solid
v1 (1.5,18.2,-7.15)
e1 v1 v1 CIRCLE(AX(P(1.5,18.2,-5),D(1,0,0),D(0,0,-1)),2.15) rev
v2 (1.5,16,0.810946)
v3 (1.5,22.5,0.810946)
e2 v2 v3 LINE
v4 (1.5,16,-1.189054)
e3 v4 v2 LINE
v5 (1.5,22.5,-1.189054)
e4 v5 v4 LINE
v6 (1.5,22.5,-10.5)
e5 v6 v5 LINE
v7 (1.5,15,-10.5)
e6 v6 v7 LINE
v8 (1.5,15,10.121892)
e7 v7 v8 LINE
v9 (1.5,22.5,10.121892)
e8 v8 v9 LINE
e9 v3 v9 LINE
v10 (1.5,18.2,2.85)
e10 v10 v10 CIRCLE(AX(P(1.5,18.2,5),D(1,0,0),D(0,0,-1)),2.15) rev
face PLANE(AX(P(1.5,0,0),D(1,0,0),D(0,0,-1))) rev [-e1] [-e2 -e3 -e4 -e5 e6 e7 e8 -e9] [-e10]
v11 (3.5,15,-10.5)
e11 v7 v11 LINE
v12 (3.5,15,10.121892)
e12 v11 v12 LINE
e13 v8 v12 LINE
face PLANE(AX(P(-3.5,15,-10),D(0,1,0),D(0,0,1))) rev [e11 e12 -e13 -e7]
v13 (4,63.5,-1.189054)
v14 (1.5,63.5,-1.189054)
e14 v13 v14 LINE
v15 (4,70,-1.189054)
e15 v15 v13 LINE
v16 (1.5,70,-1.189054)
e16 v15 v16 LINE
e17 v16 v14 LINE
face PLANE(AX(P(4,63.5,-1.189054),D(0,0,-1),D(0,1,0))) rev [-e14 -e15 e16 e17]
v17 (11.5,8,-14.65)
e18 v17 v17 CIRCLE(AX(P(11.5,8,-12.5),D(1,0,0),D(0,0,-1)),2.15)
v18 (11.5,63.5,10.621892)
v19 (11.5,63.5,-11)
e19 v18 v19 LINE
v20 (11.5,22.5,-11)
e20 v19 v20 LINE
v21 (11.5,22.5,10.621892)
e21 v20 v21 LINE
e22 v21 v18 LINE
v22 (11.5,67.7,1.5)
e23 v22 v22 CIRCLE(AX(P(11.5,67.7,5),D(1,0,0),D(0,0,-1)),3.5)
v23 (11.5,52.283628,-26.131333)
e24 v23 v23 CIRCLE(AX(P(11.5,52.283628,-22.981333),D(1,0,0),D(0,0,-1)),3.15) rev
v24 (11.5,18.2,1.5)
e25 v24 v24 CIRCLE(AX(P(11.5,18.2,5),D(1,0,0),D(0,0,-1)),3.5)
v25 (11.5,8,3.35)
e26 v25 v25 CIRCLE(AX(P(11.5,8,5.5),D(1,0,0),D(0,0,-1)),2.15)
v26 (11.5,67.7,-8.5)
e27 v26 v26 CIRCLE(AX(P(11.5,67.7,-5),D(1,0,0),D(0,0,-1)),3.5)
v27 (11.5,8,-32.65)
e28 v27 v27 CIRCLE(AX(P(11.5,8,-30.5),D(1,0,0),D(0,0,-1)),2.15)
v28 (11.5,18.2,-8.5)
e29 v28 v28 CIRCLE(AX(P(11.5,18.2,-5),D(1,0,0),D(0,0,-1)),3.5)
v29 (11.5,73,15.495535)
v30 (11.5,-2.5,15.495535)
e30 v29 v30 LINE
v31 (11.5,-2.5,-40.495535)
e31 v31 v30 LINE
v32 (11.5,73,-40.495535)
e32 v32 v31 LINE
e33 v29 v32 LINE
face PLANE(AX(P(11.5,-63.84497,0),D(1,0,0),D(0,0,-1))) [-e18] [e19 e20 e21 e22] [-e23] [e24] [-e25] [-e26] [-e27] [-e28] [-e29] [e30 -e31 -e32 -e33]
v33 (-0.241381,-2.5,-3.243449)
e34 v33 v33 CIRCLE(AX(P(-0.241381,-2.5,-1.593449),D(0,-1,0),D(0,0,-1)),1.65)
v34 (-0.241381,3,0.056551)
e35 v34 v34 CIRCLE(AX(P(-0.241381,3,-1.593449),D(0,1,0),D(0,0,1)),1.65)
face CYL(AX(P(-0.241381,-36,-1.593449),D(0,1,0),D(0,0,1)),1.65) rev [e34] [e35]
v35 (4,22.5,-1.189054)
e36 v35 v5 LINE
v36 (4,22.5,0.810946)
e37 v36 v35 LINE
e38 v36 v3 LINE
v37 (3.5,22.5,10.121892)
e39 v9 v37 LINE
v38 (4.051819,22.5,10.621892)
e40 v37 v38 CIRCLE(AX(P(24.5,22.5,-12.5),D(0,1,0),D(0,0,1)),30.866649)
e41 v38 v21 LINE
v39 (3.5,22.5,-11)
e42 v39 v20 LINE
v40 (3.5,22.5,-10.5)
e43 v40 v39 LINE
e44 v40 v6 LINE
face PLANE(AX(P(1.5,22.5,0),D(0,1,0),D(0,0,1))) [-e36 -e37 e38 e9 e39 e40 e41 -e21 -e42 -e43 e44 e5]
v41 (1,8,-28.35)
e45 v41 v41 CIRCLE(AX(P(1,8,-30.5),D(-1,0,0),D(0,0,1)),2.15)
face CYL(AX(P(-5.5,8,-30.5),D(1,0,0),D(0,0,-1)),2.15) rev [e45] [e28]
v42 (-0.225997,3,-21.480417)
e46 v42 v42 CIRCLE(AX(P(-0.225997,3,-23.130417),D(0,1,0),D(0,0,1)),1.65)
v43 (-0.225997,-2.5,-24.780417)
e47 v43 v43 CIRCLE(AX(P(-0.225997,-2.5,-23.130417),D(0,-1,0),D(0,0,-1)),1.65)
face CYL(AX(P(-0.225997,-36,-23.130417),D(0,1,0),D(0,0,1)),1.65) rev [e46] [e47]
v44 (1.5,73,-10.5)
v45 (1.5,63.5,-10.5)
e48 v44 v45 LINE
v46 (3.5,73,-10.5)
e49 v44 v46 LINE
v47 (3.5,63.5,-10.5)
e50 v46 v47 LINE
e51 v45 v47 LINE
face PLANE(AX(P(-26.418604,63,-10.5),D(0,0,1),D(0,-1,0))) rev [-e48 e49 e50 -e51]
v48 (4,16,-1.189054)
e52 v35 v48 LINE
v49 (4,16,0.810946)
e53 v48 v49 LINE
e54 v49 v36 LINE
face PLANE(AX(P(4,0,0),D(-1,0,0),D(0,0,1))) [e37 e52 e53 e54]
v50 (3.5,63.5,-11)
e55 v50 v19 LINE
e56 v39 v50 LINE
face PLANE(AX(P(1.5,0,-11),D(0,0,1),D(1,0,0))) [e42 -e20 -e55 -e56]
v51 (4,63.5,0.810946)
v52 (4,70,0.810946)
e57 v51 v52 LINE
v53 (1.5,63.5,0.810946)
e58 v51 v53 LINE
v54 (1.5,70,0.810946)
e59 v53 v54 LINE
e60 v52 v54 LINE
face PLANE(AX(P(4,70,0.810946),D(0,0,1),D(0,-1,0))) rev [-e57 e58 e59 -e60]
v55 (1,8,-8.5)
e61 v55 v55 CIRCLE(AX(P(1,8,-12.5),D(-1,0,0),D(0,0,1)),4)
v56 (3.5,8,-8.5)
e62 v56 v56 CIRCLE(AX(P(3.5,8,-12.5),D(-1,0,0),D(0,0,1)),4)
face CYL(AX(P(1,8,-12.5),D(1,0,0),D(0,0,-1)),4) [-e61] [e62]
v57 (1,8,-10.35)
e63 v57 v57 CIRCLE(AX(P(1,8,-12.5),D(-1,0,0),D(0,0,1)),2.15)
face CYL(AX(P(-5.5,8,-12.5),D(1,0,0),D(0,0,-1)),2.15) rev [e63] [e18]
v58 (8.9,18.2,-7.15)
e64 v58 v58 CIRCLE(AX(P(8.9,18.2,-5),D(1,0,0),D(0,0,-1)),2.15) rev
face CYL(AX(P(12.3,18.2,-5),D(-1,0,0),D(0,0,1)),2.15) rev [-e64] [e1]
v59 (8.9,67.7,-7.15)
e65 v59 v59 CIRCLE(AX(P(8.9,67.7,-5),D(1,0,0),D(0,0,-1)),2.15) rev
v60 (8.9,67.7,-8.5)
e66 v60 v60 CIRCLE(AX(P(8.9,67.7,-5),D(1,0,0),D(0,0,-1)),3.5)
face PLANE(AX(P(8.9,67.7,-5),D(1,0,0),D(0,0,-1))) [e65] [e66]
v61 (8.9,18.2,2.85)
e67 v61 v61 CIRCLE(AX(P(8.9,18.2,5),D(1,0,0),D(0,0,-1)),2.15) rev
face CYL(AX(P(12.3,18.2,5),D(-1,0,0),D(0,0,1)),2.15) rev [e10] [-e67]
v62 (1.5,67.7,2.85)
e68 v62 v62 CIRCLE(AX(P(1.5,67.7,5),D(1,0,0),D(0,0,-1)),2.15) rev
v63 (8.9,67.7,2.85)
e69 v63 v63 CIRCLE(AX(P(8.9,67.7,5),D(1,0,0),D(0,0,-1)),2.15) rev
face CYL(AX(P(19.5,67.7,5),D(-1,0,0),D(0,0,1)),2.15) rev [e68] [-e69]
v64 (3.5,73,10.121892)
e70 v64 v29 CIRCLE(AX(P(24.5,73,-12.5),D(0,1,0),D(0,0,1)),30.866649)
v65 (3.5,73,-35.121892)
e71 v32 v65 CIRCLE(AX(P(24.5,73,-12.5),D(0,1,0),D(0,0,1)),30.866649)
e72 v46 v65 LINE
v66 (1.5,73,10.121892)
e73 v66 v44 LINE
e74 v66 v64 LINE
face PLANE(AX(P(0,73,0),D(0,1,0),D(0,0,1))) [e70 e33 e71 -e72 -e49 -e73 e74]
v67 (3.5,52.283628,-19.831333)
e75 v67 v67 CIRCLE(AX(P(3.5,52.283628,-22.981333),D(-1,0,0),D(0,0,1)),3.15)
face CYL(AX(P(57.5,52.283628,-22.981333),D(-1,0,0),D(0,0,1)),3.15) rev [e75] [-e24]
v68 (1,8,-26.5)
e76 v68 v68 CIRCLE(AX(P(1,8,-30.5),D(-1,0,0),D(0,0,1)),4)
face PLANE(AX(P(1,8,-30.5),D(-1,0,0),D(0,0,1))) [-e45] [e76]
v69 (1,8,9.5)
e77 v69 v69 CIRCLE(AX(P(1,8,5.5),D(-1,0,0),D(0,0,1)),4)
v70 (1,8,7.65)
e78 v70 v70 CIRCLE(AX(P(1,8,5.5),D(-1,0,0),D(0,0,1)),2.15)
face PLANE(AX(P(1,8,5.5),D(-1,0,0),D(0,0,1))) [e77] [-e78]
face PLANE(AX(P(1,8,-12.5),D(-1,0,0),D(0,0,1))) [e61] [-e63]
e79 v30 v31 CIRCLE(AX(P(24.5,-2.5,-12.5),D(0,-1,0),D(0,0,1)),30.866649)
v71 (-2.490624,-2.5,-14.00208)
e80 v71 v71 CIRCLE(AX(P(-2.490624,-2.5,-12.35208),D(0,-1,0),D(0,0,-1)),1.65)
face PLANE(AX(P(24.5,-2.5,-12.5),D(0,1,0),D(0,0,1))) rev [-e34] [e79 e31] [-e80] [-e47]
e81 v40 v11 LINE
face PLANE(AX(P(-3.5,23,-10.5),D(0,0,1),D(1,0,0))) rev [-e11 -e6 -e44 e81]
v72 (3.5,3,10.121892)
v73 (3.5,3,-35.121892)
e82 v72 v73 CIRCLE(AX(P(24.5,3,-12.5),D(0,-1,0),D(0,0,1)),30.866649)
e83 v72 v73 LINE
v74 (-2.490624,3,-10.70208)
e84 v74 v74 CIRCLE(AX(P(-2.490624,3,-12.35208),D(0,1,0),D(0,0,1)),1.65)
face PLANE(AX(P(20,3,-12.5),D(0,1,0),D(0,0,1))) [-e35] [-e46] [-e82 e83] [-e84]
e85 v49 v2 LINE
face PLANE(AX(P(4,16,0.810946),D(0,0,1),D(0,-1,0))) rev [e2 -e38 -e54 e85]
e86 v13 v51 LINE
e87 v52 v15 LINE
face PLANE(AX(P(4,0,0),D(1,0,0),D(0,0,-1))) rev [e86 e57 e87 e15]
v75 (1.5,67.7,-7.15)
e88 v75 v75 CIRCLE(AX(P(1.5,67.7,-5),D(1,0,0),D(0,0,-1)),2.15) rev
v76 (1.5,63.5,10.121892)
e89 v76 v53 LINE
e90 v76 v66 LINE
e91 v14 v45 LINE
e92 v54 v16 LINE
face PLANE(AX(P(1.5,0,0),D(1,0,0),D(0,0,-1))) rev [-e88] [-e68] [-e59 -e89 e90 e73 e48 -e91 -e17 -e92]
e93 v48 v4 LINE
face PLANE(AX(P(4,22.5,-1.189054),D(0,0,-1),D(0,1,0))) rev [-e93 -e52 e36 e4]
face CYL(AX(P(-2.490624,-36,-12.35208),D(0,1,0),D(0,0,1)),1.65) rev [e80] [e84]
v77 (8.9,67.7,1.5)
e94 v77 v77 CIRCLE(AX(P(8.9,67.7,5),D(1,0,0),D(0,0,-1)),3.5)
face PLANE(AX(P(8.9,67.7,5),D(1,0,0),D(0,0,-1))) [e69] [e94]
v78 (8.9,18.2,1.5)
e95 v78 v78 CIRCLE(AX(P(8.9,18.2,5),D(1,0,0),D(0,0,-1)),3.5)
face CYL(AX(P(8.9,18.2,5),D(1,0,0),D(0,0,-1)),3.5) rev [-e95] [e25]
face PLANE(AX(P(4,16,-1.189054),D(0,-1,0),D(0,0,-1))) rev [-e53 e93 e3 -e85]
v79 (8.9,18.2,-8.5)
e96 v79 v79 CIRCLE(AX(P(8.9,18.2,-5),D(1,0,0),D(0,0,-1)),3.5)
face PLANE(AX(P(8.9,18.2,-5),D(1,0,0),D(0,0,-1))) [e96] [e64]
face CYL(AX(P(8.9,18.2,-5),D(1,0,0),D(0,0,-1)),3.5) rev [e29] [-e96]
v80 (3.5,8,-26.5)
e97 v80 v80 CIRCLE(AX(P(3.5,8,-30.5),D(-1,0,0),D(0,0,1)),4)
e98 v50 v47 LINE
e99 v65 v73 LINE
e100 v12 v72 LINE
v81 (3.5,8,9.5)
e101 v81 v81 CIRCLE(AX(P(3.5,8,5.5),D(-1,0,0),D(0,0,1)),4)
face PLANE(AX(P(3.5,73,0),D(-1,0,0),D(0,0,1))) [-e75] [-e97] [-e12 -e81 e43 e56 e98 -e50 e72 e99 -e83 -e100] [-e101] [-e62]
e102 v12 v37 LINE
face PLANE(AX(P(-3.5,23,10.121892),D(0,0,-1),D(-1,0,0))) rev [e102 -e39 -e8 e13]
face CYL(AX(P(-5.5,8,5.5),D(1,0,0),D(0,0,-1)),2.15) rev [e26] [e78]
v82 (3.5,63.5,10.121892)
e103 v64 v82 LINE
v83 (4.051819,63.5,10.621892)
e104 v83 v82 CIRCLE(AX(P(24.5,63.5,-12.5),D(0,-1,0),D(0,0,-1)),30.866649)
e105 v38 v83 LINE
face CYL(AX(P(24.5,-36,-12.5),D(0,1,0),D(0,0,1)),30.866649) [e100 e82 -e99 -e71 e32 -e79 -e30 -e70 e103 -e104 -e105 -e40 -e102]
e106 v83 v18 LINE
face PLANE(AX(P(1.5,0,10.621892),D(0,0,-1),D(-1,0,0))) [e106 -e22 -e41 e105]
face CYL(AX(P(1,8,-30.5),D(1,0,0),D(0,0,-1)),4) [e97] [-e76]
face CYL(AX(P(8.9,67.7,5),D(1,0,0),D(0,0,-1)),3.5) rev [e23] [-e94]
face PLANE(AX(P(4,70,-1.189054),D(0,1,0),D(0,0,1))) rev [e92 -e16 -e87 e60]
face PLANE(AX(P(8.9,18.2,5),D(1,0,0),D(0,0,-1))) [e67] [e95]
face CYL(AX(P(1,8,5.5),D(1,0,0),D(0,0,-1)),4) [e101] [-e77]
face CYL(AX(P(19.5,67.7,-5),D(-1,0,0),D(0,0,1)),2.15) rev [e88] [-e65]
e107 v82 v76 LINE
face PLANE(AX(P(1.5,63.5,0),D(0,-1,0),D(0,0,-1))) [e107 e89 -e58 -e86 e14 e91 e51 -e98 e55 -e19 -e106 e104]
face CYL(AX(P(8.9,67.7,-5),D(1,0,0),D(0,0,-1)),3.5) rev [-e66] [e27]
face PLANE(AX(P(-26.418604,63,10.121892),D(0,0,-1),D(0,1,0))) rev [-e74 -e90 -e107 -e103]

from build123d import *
from build123d.topology import SkipClean

# Parameters (mm, degrees)
SKETCH1_R                = 28
BOSS_EXTRUDE1_DEPTH      = 3
SKETCH2_R                = 1.625
CUT_EXTRUDE1_DEPTH       = 3
BOSS_EXTRUDE4_START      = 3
BOSS_EXTRUDE4_OUTLINE_R  = 1.625
BOSS_EXTRUDE4_DEPTH      = 70
BOSS_EXTRUDE6_DEPTH      = 7
CUT_EXTRUDE13_START      = -10
CUT_EXTRUDE13_DEPTH      = 10
SKETCH14_R               = 3.15
CUT_EXTRUDE7_DEPTH       = 54
SKETCH17_R               = 2.15
CUT_EXTRUDE10_DEPTH      = 15.8
CUT_EXTRUDE12_START      = -3
CUT_EXTRUDE12_DEPTH      = 3
SKETCH21_W               = 20.621892052
SKETCH21_H               = 10
BOSS_EXTRUDE7_DEPTH      = 7
SKETCH23_R               = 2.15
CUT_EXTRUDE17_DEPTH      = 23
SKETCH26_W               = 20.621892052
SKETCH26_H               = 58
CUT_EXTRUDE21_DEPTH      = 5
CUT_EXTRUDE22_DEPTH      = 5
SKETCH41_R               = 1.625
CUT_EXTRUDE23_DEPTH      = 70
CUT_EXTRUDE24_START      = -39
CUT_EXTRUDE24_DEPTH      = 39
BOSS_EXTRUDE12_START     = -3
SKETCH43_R               = 30.866648668
BOSS_EXTRUDE12_DEPTH     = 3
BOSS_EXTRUDE13_DEPTH     = 70
BOSS_EXTRUDE14_DEPTH     = 70
SKETCH47_R               = 1.625
SKETCH47_R_2             = 1.65
CUT_EXTRUDE26_DEPTH      = 39
SKETCH51_R               = 3.5
CUT_EXTRUDE30_DEPTH      = 2.6
CUT_EXTRUDE31_DEPTH      = 79
CUT_EXTRUDE31_DEPTH_BACK = 23
SKETCH53_R               = 2.15
CUT_EXTRUDE32_DEPTH      = 17
SKETCH56_R               = 4
SKETCH56_R_2             = 2.15
BOSS_EXTRUDE15_DEPTH     = 2.5
SKETCH57_W               = 20.621892052
SKETCH57_H               = 40
CUT_EXTRUDE33_DEPTH      = 10
SKETCH58_W               = 2
SKETCH58_H               = 6.5
CUT_EXTRUDE34_DEPTH      = 2.5
SKETCH59_R               = 1.65
BOSS_EXTRUDE16_DEPTH     = 2.5


# Read off the part's stored shape, not the designer's step: Boss-Extrude4, Cut-Extrude13
with BuildPart() as part:
    # Sketch1 → Boss-Extrude1 (new body)
    with BuildSketch(Plane(origin=(0, 0, 0), x_dir=(1, 0, 0), z_dir=(0, 1, 0))):
        with Locations(Location((20, 12.5, 0), (0, 0, 270))):
            Circle(SKETCH1_R)
    extrude(amount=BOSS_EXTRUDE1_DEPTH)

    # Sketch2 → Cut-Extrude1 (cut)
    with BuildSketch(Plane(origin=(0, 3, 0), x_dir=(1, 0, 0), z_dir=(0, 1, 0))):
        with Locations(Location((20, 19.5, 0), (0, 0, 270))):
            Circle(SKETCH2_R)
        with Locations(Location((20, 5.5, 0), (0, 0, 270))):
            Circle(SKETCH2_R)
        with Locations(Location((20, 12.5, 0), (0, 0, 270))):
            Circle(SKETCH2_R)
    extrude(amount=-CUT_EXTRUDE1_DEPTH, mode=Mode.SUBTRACT)

    # Boss-Extrude4 outline → Boss-Extrude4 (add)
    with SkipClean():  # the faces are left unmerged after this step: merging them gives an invalid solid
        with BuildSketch(Plane(origin=(0, 0, 0), x_dir=(1, 0, 0), z_dir=(0, 1, 0)).offset(BOSS_EXTRUDE4_START)):
            with BuildLine():
                ThreePointArc((3.5, -10.121892052), (48, 12.5), (3.5, 35.121892052))
                Line((3.5, 35.121892052), (3.5, -10.121892052))
            make_face()
            with Locations((20, 5.5)):
                Circle(BOSS_EXTRUDE4_OUTLINE_R, mode=Mode.SUBTRACT)
            with Locations((20, 12.5)):
                Circle(BOSS_EXTRUDE4_OUTLINE_R, mode=Mode.SUBTRACT)
            with Locations((20, 19.5)):
                Circle(BOSS_EXTRUDE4_OUTLINE_R, mode=Mode.SUBTRACT)
        extrude(amount=BOSS_EXTRUDE4_DEPTH)
    add(part.part.scale(1), mode=Mode.REPLACE)  # the faces are merged on a copy

    # Sketch13 → Boss-Extrude6 (add)
    with BuildSketch(Plane.ZY.offset(-3.5)):
        Polygon((-10, 23), (10, 23), (10.121892052, 23), (10.121892052, 15), (10, 15), (-10, 15), (-10.5, 15), (-10.5, 23), align=None)
    extrude(amount=BOSS_EXTRUDE6_DEPTH)

    # Cut-Extrude13 outline → Cut-Extrude13 (cut)
    with BuildSketch(Plane.ZY.offset(-3.5).offset(CUT_EXTRUDE13_START)):
        with BuildLine():
            Line((-10.5, 33), (-10.5, 23))
            Line((-10.5, 23), (10.121892052, 23))
            Line((10.121892052, 23), (10.121892052, 35.792364821))
            ThreePointArc((10.121892052, 35.792364821), (-1.408923961, 43.405043646), (-10.5, 33))
        make_face()
    extrude(amount=CUT_EXTRUDE13_DEPTH, mode=Mode.SUBTRACT)

    # Sketch14 → Cut-Extrude7 (cut)
    with BuildSketch(Plane.ZY.offset(-3.5)):
        with Locations((-22.981333294, 52.283628291)):
            Circle(SKETCH14_R)
    extrude(amount=-CUT_EXTRUDE7_DEPTH, mode=Mode.SUBTRACT)

    # Sketch17 → Cut-Extrude10 (cut)
    with BuildSketch(Plane.ZY.offset(3.5)):
        with Locations((-5, 18.2)):
            Circle(SKETCH17_R)
        with Locations((5, 18.2)):
            Circle(SKETCH17_R)
    extrude(amount=-CUT_EXTRUDE10_DEPTH, mode=Mode.SUBTRACT)

    # Sketch19 → Cut-Extrude12 (cut)
    with BuildSketch(Plane.ZY.offset(-3.5).offset(CUT_EXTRUDE12_START)):
        with BuildLine():
            Line((10.121892052, 63), (10.121892052, 35.792364821))
            ThreePointArc((10.121892052, 35.792364821), (-1.408923961, 43.405043646), (-10.5, 33))
            Line((-10.5, 33), (-10.5, 62))
            Line((-10.5, 62), (-10.5, 63))
            Line((-10.5, 63), (10.121892052, 63))
        make_face()
    extrude(amount=CUT_EXTRUDE12_DEPTH, mode=Mode.SUBTRACT)

    # Sketch21 → Boss-Extrude7 (add)
    with BuildSketch(Plane.ZY.offset(-3.5)):
        with Locations((-0.189053974, 68)):
            Rectangle(SKETCH21_W, SKETCH21_H)
    extrude(amount=BOSS_EXTRUDE7_DEPTH)

    # Sketch23 → Cut-Extrude17 (cut)
    with BuildSketch(Plane.ZY.offset(3.5)):
        with Locations((-5, 67.7)):
            Circle(SKETCH23_R)
        with Locations((5, 67.7)):
            Circle(SKETCH23_R)
    extrude(amount=-CUT_EXTRUDE17_DEPTH, mode=Mode.SUBTRACT)

    # Sketch26 → Cut-Extrude21 (cut)
    with BuildSketch(Plane.ZY.offset(3.5)):
        with Locations((-0.189053974, 44)):
            Rectangle(SKETCH26_W, SKETCH26_H)
    extrude(amount=-CUT_EXTRUDE21_DEPTH, mode=Mode.SUBTRACT)

    # Sketch27 → Cut-Extrude22 (cut)
    with BuildSketch(Plane.ZY.offset(-6.5)):
        Polygon((10.121892052, 63), (-10.5, 63), (-10.5, 33), (10.121892052, 35.792364821), align=None)
    extrude(amount=-CUT_EXTRUDE22_DEPTH, mode=Mode.SUBTRACT)

    # Sketch41 → Cut-Extrude23 (cut)
    with BuildSketch(Plane(origin=(0, 73, 0), x_dir=(1, 0, 0), z_dir=(0, 1, 0))):
        with BuildLine():
            Line((11.5, 39.178643144), (11.5, 10.5))
            Line((11.5, 10.5), (11.5, -14.178643144))
            ThreePointArc((11.5, -14.178643144), (48, 12.5), (11.5, 39.178643144))
        make_face()
        with Locations(Location((20, 5.5, 0), (0, 0, 270))):
            Circle(SKETCH41_R, mode=Mode.SUBTRACT)
        with Locations(Location((20, 12.5, 0), (0, 0, 270))):
            Circle(SKETCH41_R, mode=Mode.SUBTRACT)
        with Locations(Location((20, 19.5, 0), (0, 0, 270))):
            Circle(SKETCH41_R, mode=Mode.SUBTRACT)
    extrude(amount=-CUT_EXTRUDE23_DEPTH, mode=Mode.SUBTRACT)

    # Sketch42 → Cut-Extrude24 (cut)
    with SkipClean():  # the faces are left unmerged after this step: merging them gives an invalid solid
        with BuildSketch(Plane(origin=(0, 3, 0), x_dir=(1, 0, 0), z_dir=(0, 1, 0)).offset(CUT_EXTRUDE24_START)):
            with BuildLine():
                ThreePointArc((3.5, 35.121892052), (-6.366648668, 12.5), (3.5, -10.121892052))
                ThreePointArc((3.5, -10.121892052), (-8, 12.5), (3.5, 35.121892052))
            make_face()
        extrude(amount=CUT_EXTRUDE24_DEPTH, mode=Mode.SUBTRACT)

    # Sketch43 → Boss-Extrude12 (add)
    with SkipClean():  # the faces are left unmerged after this step: merging them gives an invalid solid
        with BuildSketch(Plane(origin=(0, 3, 0), x_dir=(1, 0, 0), z_dir=(0, 1, 0)).offset(BOSS_EXTRUDE12_START)):
            with Locations(Location((24.5, 12.5, 0), (0, 0, 270))):
                Circle(SKETCH43_R)
        extrude(amount=BOSS_EXTRUDE12_DEPTH)
    add(part.part.scale(1), mode=Mode.REPLACE)  # the faces are merged on a copy

    # Sketch45 → Boss-Extrude13 (add)
    with BuildSketch(Plane(origin=(0, 3, 0), x_dir=(1, 0, 0), z_dir=(0, 1, 0))):
        with BuildLine():
            Line((11.5, 40.495535358), (11.5, 39.178643144))
            ThreePointArc((11.5, 39.178643144), (7.336497035, 37.472698946), (3.5, 35.121892052))
            ThreePointArc((3.5, 35.121892052), (7.288985777, 38.12286068), (11.5, 40.495535358))
        make_face()
        with BuildLine():
            Line((11.5, -14.178643144), (11.5, -15.495535358))
            ThreePointArc((11.5, -15.495535358), (7.288985777, -13.12286068), (3.5, -10.121892052))
            ThreePointArc((3.5, -10.121892052), (7.336497035, -12.472698946), (11.5, -14.178643144))
        make_face()
    extrude(amount=BOSS_EXTRUDE13_DEPTH)

    # Sketch46 → Boss-Extrude14 (add)
    with BuildSketch(Plane(origin=(0, 3, 0), x_dir=(1, 0, 0), z_dir=(0, 1, 0))):
        with BuildLine():
            Line((37.5, 40.495535358), (37.5, 12.5))
            Line((37.5, 12.5), (37.5, -15.495535358))
            ThreePointArc((37.5, -15.495535358), (41.711014223, -13.12286068), (45.5, -10.121892052))
            Line((45.5, -10.121892052), (45.5, 12.5))
            Line((45.5, 12.5), (45.5, 35.121892052))
            ThreePointArc((45.5, 35.121892052), (41.711014223, 38.12286068), (37.5, 40.495535358))
        make_face()
    extrude(amount=BOSS_EXTRUDE14_DEPTH)

    # Sketch47 → Cut-Extrude26 (cut)
    with BuildSketch(Plane(origin=(0, 3, 0), x_dir=(1, 0, 0), z_dir=(0, 1, 0))):
        with Locations(Location((24.638783134, 19.352080003, 0), (0, 0, 270))):
            Circle(SKETCH47_R)
        with Locations(Location((24.638783134, 12.352080003, 0), (0, 0, 270))):
            Circle(SKETCH47_R)
        with Locations(Location((-0.241381273, 1.593448641, 0), (0, 0, 270))):
            Circle(SKETCH47_R_2)
        with Locations(Location((48.503562926, 26.13041704, 0), (0, 0, 270))):
            Circle(SKETCH47_R)
        with Locations(Location((48.503562926, -1.426257034, 0), (0, 0, 270))):
            Circle(SKETCH47_R)
        with Locations(Location((24.638783134, -15.204594071, 0), (0, 0, 270))):
            Circle(SKETCH47_R)
        with Locations(Location((24.638783134, 39.908754076, 0), (0, 0, 270))):
            Circle(SKETCH47_R)
        with Locations(Location((30.700960961, 15.852080003, 0), (0, 0, 270))):
            Circle(SKETCH47_R)
        with Locations(Location((-2.490624188, 12.352080003, 0), (0, 0, 270))):
            Circle(SKETCH47_R_2)
        with Locations(Location((51.768190456, 12.352080003, 0), (0, 0, 270))):
            Circle(SKETCH47_R)
        with Locations(Location((24.638783134, 26.13041704, 0), (0, 0, 270))):
            Circle(SKETCH47_R)
        with Locations(Location((24.638783134, -1.426257034, 0), (0, 0, 270))):
            Circle(SKETCH47_R)
        with Locations(Location((30.700960961, 8.852080003, 0), (0, 0, 270))):
            Circle(SKETCH47_R)
        with Locations(Location((24.638783134, 5.352080003, 0), (0, 0, 270))):
            Circle(SKETCH47_R)
        with Locations(Location((18.576605308, 8.852080003, 0), (0, 0, 270))):
            Circle(SKETCH47_R)
        with Locations(Location((18.576605308, 15.852080003, 0), (0, 0, 270))):
            Circle(SKETCH47_R)
        with Locations(Location((-0.225996657, 23.13041704, 0), (0, 0, 270))):
            Circle(SKETCH47_R_2)
    extrude(amount=-CUT_EXTRUDE26_DEPTH, mode=Mode.SUBTRACT)

    # Sketch51 → Cut-Extrude30 (cut)
    with BuildSketch(Plane(origin=(11.5, 0, 0), x_dir=(0, 0, -1), z_dir=(1, 0, 0))):
        with Locations((-5, 18.2)):
            Circle(SKETCH51_R)
        with Locations((5, 18.2)):
            Circle(SKETCH51_R)
        with Locations((-5, 67.7)):
            Circle(SKETCH51_R)
        with Locations((5, 67.7)):
            Circle(SKETCH51_R)
    extrude(amount=-CUT_EXTRUDE30_DEPTH, mode=Mode.SUBTRACT)

    # Sketch52 → Cut-Extrude31 (cut, two sides: drawn at the far end of the back side and taken through both)
    with BuildSketch(Plane(origin=(0, 3, 0), x_dir=(1, 0, 0), z_dir=(0, 1, 0)).offset(-CUT_EXTRUDE31_DEPTH_BACK)):
        with BuildLine():
            Line((11.5, 40.495535358), (11.5, -15.495535358))
            ThreePointArc((11.5, -15.495535358), (55.366648668, 12.5), (11.5, 40.495535358))
        make_face()
    extrude(amount=CUT_EXTRUDE31_DEPTH + CUT_EXTRUDE31_DEPTH_BACK, mode=Mode.SUBTRACT)

    # Sketch53 → Cut-Extrude32 (cut)
    with BuildSketch(Plane(origin=(11.5, 0, 0), x_dir=(0, 0, -1), z_dir=(1, 0, 0))):
        with Locations((-5.5, 8)):
            Circle(SKETCH53_R)
        with Locations((12.5, 8)):
            Circle(SKETCH53_R)
        with Locations((30.5, 8)):
            Circle(SKETCH53_R)
    extrude(amount=-CUT_EXTRUDE32_DEPTH, mode=Mode.SUBTRACT)

    # Sketch56 → Boss-Extrude15 (add)
    # profile 1 of 3: a face of its own
    with BuildSketch(Plane.ZY.offset(-3.5)):
        with Locations((-30.5, 8)):
            Circle(SKETCH56_R)
        with Locations(Location((-30.5, 8, 0), (0, 0, 180))):
            Circle(SKETCH56_R_2, mode=Mode.SUBTRACT)
    # profile 2 of 3: a face of its own
    with BuildSketch(Plane.ZY.offset(-3.5)):
        with Locations((-12.5, 8)):
            Circle(SKETCH56_R)
        with Locations(Location((-12.5, 8, 0), (0, 0, 180))):
            Circle(SKETCH56_R_2, mode=Mode.SUBTRACT)
    # profile 3 of 3: a face of its own
    with BuildSketch(Plane.ZY.offset(-3.5)):
        with Locations((5.5, 8)):
            Circle(SKETCH56_R)
        with Locations(Location((5.5, 8, 0), (0, 0, 180))):
            Circle(SKETCH56_R_2, mode=Mode.SUBTRACT)
    extrude(amount=BOSS_EXTRUDE15_DEPTH)

    # Sketch57 → Cut-Extrude33 (cut)
    with BuildSketch(Plane(origin=(11.5, 0, 0), x_dir=(0, 0, -1), z_dir=(1, 0, 0))):
        Polygon((-10.621892052, 63.5), (-10.621892052, 63), (-10.621892052, 22.5), (-10.121892052, 22.5), (11, 22.5), (11, 23), (11, 63.5), (10.5, 63.5), align=None)
        with Locations((0.189053974, 43)):
            Rectangle(SKETCH57_W, SKETCH57_H, mode=Mode.SUBTRACT)
    extrude(amount=-CUT_EXTRUDE33_DEPTH, mode=Mode.SUBTRACT)

    # Sketch58 → Cut-Extrude34 (cut)
    with BuildSketch(Plane.ZY.offset(-1.5)):
        Polygon((-0.189053974, 22.5), (-1.189053974, 22.5), (-1.189053974, 16), (0.810946026, 16), (0.810946026, 22.5), align=None)
        with Locations((-0.189053974, 66.75)):
            Rectangle(SKETCH58_W, SKETCH58_H)
    extrude(amount=-CUT_EXTRUDE34_DEPTH, mode=Mode.SUBTRACT)

    # Sketch59 → Boss-Extrude16 (add)
    with BuildSketch(Plane.XZ):
        with BuildLine():
            Line((11.5, -40.495535358), (11.5, 15.495535358))
            ThreePointArc((11.5, 15.495535358), (-6.366648668, -12.5), (11.5, -40.495535358))
        make_face()
        with Locations(Location((-0.225996657, -23.13041704, 0), (0, 0, 90))):
            Circle(SKETCH59_R, mode=Mode.SUBTRACT)
        with Locations(Location((-2.490624188, -12.352080003, 0), (0, 0, 90))):
            Circle(SKETCH59_R, mode=Mode.SUBTRACT)
        with Locations(Location((-0.241381273, -1.593448641, 0), (0, 0, 90))):
            Circle(SKETCH59_R, mode=Mode.SUBTRACT)
    extrude(amount=BOSS_EXTRUDE16_DEPTH)


solid = part.part
